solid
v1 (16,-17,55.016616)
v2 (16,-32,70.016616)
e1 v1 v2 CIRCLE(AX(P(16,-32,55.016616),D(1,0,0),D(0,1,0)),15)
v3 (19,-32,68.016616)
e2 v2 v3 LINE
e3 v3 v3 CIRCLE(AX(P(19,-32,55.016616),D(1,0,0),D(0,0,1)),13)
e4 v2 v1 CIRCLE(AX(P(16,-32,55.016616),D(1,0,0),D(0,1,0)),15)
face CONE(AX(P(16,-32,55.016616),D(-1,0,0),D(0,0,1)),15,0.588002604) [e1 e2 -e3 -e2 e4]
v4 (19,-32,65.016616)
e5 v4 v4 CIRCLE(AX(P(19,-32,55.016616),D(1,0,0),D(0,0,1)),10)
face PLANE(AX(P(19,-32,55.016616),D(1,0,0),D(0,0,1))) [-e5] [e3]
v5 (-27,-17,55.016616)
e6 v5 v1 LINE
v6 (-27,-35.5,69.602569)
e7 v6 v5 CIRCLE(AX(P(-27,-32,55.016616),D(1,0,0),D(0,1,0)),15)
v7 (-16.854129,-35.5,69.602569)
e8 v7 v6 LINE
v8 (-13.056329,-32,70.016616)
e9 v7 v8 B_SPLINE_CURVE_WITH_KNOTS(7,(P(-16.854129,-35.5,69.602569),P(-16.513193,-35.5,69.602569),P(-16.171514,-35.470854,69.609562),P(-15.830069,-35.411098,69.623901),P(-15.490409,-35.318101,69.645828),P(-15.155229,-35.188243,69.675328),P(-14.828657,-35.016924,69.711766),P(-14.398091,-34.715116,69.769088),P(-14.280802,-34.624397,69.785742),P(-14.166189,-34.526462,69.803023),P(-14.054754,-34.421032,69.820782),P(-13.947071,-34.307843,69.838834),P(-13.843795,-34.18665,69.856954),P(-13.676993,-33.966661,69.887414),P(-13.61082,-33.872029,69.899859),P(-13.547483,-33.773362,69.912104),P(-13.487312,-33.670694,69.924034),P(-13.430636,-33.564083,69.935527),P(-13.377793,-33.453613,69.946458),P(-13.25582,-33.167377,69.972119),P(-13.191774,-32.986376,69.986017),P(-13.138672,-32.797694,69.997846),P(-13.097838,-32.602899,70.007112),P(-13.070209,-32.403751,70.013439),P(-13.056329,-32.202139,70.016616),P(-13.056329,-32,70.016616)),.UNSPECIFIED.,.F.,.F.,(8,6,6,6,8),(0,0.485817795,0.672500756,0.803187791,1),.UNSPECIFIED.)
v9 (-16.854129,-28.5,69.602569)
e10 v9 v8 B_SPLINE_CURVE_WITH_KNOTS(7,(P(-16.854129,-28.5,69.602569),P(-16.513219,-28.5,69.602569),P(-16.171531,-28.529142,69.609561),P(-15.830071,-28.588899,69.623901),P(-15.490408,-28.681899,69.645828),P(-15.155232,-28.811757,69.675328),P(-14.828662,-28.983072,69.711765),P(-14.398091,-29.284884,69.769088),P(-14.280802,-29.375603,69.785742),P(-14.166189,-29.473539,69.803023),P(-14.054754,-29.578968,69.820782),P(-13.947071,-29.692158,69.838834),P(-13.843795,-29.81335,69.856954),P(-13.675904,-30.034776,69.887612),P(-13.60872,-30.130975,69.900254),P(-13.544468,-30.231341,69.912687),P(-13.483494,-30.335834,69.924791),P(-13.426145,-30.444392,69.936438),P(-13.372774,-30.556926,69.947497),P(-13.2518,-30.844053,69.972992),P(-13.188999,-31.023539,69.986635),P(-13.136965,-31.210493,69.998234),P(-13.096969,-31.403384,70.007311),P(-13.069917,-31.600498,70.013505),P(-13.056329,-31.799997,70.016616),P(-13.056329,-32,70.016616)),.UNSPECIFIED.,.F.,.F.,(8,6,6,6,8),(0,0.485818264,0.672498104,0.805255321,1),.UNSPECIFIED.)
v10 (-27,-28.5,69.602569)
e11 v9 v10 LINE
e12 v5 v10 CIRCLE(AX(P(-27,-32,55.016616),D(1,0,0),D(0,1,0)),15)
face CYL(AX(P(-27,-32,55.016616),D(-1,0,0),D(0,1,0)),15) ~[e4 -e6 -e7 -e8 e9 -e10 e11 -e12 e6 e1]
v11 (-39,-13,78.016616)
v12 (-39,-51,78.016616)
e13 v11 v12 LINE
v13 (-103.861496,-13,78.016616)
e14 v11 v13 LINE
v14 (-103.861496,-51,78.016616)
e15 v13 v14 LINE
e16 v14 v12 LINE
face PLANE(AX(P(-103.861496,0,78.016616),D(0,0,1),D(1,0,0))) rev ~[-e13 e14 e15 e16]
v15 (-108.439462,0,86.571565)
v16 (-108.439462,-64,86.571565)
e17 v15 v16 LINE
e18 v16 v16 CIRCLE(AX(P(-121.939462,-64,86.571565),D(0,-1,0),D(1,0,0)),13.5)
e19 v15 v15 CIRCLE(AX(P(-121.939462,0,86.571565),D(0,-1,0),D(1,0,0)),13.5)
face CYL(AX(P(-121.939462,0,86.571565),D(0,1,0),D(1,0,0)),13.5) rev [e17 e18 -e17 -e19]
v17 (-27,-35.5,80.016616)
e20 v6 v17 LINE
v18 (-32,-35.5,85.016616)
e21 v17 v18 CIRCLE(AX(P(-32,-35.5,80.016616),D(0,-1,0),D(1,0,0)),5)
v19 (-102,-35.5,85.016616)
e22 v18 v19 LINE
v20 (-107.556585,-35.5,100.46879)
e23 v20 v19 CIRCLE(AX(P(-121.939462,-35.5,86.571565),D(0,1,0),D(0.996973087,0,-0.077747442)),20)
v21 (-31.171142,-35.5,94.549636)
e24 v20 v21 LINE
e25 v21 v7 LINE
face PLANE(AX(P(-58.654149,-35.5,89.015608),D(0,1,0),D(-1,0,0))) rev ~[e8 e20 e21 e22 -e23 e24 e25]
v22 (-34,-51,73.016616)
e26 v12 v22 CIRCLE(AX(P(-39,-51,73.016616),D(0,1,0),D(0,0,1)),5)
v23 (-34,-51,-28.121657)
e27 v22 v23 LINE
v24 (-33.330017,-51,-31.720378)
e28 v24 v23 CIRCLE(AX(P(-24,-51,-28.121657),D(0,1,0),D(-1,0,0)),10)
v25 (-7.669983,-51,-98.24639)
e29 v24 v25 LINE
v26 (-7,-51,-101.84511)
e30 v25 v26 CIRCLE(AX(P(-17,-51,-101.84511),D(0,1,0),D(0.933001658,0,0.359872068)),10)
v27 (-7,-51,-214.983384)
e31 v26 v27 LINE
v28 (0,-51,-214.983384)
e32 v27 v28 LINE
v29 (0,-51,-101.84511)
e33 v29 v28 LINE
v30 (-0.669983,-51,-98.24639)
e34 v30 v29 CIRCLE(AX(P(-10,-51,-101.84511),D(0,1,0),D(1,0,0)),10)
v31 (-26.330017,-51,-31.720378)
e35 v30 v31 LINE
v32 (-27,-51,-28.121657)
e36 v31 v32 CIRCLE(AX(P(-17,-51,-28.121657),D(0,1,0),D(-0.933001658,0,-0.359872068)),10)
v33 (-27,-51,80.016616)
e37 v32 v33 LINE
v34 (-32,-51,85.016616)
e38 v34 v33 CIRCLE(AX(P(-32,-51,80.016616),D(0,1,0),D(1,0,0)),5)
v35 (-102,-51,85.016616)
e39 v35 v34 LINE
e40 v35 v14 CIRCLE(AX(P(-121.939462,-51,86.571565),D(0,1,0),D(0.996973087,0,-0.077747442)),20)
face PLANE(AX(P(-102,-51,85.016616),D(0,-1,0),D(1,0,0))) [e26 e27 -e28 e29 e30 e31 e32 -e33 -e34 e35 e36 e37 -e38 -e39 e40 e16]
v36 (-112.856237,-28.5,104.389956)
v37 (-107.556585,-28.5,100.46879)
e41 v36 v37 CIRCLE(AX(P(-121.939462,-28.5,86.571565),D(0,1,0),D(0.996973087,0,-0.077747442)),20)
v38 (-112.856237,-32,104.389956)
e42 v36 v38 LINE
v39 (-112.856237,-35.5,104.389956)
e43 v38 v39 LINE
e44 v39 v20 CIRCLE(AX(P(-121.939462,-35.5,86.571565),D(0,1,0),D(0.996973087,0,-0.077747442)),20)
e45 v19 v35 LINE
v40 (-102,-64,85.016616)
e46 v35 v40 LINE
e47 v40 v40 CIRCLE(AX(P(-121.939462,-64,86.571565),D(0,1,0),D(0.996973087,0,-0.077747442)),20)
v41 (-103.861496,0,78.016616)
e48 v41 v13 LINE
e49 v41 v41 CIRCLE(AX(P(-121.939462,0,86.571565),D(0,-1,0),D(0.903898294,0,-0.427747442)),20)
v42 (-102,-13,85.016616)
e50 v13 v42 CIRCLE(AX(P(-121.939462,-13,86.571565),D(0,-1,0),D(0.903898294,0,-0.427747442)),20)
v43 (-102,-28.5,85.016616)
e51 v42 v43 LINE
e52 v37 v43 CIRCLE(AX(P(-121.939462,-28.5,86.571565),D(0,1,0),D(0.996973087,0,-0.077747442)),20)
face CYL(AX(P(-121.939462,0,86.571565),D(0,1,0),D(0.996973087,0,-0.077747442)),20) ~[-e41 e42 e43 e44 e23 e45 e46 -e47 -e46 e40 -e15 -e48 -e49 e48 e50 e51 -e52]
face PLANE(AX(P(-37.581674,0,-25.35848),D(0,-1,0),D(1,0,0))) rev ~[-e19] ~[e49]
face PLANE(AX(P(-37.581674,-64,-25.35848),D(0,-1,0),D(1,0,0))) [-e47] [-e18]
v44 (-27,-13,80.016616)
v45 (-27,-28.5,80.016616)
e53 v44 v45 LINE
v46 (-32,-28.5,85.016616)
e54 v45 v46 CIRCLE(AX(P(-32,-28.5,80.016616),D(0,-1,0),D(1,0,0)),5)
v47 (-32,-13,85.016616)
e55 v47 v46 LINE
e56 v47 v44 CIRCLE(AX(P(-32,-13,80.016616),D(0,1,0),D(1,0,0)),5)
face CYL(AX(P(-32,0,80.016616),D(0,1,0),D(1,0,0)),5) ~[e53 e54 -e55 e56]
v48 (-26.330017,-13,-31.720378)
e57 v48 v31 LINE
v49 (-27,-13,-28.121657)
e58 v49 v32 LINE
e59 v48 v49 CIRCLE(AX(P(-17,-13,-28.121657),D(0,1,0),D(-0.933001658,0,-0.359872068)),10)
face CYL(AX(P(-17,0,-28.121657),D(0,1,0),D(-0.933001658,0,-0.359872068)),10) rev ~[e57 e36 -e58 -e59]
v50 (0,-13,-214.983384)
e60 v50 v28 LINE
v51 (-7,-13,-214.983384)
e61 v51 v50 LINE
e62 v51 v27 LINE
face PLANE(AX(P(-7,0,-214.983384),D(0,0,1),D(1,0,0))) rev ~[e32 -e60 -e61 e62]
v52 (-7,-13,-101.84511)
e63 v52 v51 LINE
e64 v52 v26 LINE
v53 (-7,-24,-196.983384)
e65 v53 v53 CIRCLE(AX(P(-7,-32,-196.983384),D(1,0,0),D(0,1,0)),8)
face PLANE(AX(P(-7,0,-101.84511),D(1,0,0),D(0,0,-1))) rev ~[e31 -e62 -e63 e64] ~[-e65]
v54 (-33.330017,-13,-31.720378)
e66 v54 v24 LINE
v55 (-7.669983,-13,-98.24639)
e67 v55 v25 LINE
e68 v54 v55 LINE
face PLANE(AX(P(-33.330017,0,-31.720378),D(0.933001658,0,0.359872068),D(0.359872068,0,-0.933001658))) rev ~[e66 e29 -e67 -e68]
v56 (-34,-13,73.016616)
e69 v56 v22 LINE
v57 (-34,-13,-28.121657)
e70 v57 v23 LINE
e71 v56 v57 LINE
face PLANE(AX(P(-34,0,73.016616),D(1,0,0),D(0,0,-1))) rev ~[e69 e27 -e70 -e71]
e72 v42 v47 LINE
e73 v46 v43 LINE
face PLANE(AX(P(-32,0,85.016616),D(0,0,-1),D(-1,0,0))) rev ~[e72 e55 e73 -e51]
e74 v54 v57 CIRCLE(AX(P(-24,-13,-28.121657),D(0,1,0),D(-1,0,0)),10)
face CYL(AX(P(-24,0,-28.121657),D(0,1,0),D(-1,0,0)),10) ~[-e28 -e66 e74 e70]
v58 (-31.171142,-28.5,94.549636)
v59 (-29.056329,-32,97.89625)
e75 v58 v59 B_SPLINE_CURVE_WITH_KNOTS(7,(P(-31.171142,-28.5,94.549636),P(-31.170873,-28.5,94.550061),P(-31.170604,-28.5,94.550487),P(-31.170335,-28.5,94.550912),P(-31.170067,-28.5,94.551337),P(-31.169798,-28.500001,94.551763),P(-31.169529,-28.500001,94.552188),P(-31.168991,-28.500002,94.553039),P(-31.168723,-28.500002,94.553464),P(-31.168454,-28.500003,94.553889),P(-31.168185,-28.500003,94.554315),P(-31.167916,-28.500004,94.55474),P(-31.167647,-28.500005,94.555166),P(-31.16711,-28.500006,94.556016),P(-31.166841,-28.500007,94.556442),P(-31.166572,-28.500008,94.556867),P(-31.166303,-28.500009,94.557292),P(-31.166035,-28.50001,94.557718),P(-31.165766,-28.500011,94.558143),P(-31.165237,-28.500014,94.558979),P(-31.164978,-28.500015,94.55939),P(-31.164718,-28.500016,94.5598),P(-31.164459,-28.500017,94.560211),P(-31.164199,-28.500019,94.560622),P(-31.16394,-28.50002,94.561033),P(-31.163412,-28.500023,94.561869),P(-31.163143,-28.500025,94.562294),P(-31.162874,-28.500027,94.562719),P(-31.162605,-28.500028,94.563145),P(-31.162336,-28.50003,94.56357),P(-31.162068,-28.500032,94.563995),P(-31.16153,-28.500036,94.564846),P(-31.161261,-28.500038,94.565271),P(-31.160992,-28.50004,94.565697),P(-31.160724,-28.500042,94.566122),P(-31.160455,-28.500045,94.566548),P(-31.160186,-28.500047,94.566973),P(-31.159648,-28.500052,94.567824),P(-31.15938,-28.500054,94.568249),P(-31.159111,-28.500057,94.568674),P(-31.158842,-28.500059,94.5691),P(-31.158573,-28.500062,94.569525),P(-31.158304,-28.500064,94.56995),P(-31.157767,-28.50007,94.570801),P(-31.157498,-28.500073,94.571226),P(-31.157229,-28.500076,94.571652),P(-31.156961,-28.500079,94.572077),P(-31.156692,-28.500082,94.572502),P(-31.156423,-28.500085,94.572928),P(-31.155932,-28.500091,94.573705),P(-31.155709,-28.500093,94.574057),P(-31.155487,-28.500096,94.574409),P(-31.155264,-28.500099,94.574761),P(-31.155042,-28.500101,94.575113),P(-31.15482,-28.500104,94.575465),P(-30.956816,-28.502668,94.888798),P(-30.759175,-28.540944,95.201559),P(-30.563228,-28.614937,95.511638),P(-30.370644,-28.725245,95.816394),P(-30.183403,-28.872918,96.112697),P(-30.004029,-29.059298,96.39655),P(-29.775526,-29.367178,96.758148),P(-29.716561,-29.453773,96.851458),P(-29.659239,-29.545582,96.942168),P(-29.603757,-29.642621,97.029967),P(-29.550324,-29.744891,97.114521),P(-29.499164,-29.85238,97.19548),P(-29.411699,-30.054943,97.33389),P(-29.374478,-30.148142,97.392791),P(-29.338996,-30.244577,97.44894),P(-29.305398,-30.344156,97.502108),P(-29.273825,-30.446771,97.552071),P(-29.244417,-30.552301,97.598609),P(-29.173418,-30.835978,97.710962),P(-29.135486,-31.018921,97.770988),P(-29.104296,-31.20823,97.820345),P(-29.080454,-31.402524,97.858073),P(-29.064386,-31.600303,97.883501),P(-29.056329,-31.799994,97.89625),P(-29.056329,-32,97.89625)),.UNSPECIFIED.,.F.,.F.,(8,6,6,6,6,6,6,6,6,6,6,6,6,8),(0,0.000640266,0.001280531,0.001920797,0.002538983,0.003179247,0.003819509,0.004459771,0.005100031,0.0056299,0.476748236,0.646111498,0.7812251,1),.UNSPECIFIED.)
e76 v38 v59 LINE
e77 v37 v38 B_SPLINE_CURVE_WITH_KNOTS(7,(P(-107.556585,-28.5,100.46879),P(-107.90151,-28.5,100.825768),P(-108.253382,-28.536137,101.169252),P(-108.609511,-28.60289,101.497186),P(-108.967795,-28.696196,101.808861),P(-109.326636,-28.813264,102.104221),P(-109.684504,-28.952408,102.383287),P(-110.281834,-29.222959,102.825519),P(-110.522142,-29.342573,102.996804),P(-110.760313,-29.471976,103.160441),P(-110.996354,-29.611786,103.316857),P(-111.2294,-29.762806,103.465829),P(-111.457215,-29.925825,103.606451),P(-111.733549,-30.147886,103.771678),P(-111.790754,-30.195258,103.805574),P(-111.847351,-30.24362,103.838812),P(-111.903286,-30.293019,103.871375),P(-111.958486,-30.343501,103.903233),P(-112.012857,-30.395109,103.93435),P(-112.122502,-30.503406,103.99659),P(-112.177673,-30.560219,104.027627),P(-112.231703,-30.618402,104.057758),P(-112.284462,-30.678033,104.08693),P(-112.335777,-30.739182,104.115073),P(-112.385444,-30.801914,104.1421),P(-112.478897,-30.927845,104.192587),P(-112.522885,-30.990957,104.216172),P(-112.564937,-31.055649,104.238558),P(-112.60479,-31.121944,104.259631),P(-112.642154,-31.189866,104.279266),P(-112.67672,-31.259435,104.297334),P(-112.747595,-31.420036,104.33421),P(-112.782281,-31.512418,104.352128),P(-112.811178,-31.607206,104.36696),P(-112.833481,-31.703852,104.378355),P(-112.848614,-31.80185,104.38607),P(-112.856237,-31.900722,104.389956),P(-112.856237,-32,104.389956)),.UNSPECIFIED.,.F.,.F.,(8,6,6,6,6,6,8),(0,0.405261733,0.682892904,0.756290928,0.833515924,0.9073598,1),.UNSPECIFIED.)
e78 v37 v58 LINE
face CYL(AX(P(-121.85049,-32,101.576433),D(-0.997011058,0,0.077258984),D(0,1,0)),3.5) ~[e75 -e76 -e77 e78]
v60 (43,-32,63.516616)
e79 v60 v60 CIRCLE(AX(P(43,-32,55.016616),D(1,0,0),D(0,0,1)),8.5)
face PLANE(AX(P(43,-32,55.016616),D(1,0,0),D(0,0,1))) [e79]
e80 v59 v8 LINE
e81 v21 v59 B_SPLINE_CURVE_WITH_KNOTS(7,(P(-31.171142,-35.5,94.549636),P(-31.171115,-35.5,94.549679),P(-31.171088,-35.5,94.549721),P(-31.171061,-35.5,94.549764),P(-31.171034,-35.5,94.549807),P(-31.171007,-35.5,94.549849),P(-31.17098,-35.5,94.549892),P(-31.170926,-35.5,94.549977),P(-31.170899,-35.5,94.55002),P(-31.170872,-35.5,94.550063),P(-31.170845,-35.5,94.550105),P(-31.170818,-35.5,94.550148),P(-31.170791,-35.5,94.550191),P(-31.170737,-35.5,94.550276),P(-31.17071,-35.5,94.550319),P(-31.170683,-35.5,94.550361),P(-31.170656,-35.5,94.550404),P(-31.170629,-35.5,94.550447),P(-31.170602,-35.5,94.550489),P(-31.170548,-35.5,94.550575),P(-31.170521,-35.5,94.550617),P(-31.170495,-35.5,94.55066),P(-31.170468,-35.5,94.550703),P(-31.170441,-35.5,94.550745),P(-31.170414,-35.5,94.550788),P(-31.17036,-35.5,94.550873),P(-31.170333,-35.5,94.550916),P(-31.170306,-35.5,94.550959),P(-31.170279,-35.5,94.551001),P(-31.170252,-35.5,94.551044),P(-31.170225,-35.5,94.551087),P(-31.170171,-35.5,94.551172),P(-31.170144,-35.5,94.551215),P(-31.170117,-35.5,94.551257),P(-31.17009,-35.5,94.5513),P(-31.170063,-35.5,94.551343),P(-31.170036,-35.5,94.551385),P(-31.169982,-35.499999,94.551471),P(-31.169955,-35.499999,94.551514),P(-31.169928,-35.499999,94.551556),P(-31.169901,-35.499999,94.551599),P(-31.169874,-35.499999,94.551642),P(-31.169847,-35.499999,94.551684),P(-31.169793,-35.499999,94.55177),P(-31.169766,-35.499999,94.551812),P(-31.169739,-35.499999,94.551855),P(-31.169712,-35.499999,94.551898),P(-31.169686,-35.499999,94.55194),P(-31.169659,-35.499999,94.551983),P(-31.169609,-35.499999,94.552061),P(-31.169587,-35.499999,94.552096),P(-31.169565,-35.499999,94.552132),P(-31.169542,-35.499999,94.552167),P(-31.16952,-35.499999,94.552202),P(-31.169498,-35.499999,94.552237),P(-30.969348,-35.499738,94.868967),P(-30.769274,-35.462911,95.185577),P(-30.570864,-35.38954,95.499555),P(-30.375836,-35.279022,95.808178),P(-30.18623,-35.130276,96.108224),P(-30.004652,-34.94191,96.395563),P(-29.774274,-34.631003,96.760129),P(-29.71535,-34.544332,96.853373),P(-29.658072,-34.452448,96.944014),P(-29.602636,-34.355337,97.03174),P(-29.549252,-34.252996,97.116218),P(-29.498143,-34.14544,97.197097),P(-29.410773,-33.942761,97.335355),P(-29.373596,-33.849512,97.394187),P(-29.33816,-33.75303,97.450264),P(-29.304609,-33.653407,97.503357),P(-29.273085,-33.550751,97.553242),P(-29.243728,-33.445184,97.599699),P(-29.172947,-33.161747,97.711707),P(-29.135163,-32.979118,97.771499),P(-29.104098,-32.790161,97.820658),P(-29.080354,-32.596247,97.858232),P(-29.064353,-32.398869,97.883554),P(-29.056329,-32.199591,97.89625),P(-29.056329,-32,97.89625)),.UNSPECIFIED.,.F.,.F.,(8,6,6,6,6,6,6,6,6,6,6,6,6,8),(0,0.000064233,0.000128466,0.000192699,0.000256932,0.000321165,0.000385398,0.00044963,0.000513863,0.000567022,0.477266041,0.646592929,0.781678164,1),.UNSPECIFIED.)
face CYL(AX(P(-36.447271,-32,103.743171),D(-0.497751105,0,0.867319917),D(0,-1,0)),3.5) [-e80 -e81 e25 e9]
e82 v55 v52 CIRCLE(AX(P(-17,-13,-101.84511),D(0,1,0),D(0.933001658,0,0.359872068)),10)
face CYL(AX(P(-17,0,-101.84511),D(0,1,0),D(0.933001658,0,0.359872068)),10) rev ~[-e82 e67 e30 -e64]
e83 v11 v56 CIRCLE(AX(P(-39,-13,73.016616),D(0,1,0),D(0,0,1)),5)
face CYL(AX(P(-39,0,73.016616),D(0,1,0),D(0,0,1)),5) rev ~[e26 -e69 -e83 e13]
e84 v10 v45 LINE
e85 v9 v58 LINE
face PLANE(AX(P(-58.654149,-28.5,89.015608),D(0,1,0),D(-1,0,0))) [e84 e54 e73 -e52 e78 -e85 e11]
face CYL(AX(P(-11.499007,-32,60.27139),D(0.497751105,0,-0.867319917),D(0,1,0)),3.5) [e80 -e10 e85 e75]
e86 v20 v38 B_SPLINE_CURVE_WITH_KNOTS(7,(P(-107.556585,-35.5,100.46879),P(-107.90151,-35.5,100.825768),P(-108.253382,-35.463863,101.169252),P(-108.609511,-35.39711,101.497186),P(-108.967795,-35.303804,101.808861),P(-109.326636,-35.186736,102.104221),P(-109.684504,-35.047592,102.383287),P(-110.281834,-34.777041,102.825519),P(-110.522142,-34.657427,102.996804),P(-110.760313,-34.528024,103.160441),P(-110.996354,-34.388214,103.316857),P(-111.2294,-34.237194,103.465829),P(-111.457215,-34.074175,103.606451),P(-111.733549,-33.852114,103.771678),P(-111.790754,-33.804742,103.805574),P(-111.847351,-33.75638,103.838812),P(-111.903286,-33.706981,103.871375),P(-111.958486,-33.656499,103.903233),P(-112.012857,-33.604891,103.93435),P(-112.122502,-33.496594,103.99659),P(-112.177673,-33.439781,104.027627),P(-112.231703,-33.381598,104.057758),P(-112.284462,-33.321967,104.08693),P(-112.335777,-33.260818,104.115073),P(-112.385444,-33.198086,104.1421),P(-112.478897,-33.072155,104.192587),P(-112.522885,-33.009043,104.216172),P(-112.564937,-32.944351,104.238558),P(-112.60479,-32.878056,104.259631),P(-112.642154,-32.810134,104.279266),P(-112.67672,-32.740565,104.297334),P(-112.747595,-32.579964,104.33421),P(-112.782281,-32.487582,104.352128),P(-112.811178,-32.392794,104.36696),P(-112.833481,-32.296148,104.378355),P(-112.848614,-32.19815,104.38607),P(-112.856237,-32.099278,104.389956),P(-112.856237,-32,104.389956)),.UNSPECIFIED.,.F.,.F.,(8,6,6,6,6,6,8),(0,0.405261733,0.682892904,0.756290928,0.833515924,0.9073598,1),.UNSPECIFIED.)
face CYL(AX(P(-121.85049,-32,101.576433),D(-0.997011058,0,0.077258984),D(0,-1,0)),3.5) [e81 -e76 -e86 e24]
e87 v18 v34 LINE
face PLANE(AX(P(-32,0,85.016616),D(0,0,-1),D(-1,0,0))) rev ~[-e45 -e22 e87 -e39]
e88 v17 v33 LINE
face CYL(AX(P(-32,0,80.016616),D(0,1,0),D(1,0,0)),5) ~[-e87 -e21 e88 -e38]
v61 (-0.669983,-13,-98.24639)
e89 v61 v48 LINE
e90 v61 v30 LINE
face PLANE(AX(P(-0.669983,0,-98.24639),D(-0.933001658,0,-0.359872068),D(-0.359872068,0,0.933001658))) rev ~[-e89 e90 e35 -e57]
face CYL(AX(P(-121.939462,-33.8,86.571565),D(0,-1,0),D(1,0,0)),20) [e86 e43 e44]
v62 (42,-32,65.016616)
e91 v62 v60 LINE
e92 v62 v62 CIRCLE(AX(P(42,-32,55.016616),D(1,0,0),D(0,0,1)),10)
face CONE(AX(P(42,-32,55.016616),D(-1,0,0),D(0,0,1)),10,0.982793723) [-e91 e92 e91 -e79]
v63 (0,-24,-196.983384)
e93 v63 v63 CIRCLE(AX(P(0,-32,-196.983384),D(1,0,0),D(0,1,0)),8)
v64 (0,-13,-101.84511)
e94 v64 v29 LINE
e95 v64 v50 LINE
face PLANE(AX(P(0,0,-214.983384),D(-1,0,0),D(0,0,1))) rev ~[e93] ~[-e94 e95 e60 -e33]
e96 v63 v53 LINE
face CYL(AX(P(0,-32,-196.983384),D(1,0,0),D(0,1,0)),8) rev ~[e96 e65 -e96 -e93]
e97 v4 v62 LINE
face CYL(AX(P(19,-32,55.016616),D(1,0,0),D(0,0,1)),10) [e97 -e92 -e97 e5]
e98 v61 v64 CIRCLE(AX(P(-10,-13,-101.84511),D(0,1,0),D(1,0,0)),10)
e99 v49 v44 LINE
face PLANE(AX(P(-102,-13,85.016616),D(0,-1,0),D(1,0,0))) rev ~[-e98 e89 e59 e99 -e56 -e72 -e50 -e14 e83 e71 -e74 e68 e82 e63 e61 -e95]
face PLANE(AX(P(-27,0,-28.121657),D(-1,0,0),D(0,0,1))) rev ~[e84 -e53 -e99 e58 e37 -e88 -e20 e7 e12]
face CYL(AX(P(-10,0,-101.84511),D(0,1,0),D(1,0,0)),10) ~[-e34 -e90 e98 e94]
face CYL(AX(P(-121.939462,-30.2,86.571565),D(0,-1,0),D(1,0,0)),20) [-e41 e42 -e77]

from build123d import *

# Parameters (mm, degrees)
F0_R           = 13.5
F1_DEPTH       = 64
F2_W           = 102
F2_H           = 13
F3_DEPTH       = 400
F5_DEPTH       = 13
F7_DEPTH       = 13
F8_R           = 15
F9_DEPTH       = 43
F14_DEPTH      = 3.5
F14_DEPTH_BACK = 3.5
F15_R          = 8
F16_DEPTH      = 25
F17_T4_DEPTH   = 101.551131953
F17_S5_R       = 20
F17_T6_DEPTH   = 53
F17_T10_DEPTH  = 101.551131953
F17_S11_R      = 20
F17_T12_DEPTH  = 53
F17_T16_DEPTH  = 50.1219672703
F17_S17_R      = 15
F17_T18_DEPTH  = 28
F17_T22_DEPTH  = 50.1219672703
F17_S23_R      = 15
F17_T24_DEPTH  = 28


# Not quite as in the source:
# - a fillet or chamfer that OpenCascade refuses, or shapes differently, is made with other operations: its cross-section is extruded or revolved along the edge and cut away or added


with BuildPart() as f1:
    # F0 (on Front) → F1 (new body)
    with BuildSketch(Plane.XZ):
        with BuildLine():
            Line((-7, -214.9833835959), (0, -214.9833835959))
            Line((0, -214.9833835959), (0, -101.8451102358))
            ThreePointArc((0, -101.8451102358), (-0.1689225963, -100.0148323657), (-0.6699834164, -98.2463895535))
            Line((-0.6699834164, -98.2463895535), (-26.3300165836, -31.7203776383))
            ThreePointArc((-26.3300165836, -31.7203776383), (-26.8310774037, -29.9519348262), (-27, -28.1216569561))
            Line((-27, -28.1216569561), (-27, 80.0166164041))
            ThreePointArc((-27, 80.0166164041), (-28.4644660941, 83.55215031), (-32, 85.0166164041))
            Line((-32, 85.0166164041), (-102, 85.0166164041))
            ThreePointArc((-102, 85.0166164041), (-141.2677104995, 91.7114873793), (-103.8614958525, 78.0166164041))
            Line((-103.8614958525, 78.0166164041), (-39, 78.0166164041))
            ThreePointArc((-39, 78.0166164041), (-35.4644660941, 76.55215031), (-34, 73.0166164041))
            Line((-34, 73.0166164041), (-34, -28.1216569561))
            ThreePointArc((-34, -28.1216569561), (-33.8310774037, -29.9519348262), (-33.3300165836, -31.7203776383))
            Line((-33.3300165836, -31.7203776383), (-7.6699834164, -98.2463895535))
            ThreePointArc((-7.6699834164, -98.2463895535), (-7.1689225963, -100.0148323657), (-7, -101.8451102358))
            Line((-7, -101.8451102358), (-7, -214.9833835959))
        make_face()
        with Locations((-121.9394617303, 86.5715652479)):
            Circle(F0_R, mode=Mode.SUBTRACT)
    extrude(amount=F1_DEPTH)

    # F2 (on face) → F3 (cut)
    with BuildSketch(Plane.XY.offset(85.0166164041)):
        with Locations((-51, -6.5)):
            Rectangle(F2_W, F2_H)
        with Locations((-51, -57.5)):
            Rectangle(F2_W, F2_H)
    extrude(amount=-F3_DEPTH, mode=Mode.SUBTRACT)

    # F4 (on face) → F5 (cut)
    with BuildSketch(Plane(origin=(0, 0, 0), x_dir=(-1, 0, 0), z_dir=(0, 1, 0))):
        with BuildLine():
            ThreePointArc((103.8614958525, 78.0166164041), (102.6112129611, 81.4316431166), (102, 85.0166164041))
            Line((102, 85.0166164041), (102, 78.0166164041))
            Line((102, 78.0166164041), (103.8614958525, 78.0166164041))
        make_face()
    extrude(amount=-F5_DEPTH, mode=Mode.SUBTRACT)

    # F6 (on face) → F7 (cut)
    with BuildSketch(Plane.XZ.offset(64)):
        with BuildLine():
            Line((-102, 78.0166164041), (-102, 85.0166164041))
            ThreePointArc((-102, 85.0166164041), (-102.6112129611, 81.4316431166), (-103.8614958525, 78.0166164041))
            Line((-103.8614958525, 78.0166164041), (-102, 78.0166164041))
        make_face()
    extrude(amount=-F7_DEPTH, mode=Mode.SUBTRACT)

    # F8 (on face) → F9 (join)
    with BuildSketch(Plane.YZ.offset(-27)):
        with Locations((-32, 55.0166164041)):
            Circle(F8_R)
    extrude(amount=F9_DEPTH)

    # F11 (on face) → F12 (revolve)
    with BuildSketch(Plane(origin=(0, -32, 0), x_dir=(-1, 0, 0), z_dir=(0, 1, 0))):
        Polygon((-16, 55.0166164041), (-16, 70.0166164041), (-19, 68.0166164041), (-19, 65.0166164041), (-42, 65.0166164041), (-43, 63.5166164041), (-43, 55.0166164041), align=None)
    revolve(axis=Axis((29.5, -32, 55.0166164041), (1, 0, 0)))

    # F13 (on face) → F14 (join, two sides)
    with BuildSketch(Plane(origin=(0, -32, 0), x_dir=(-1, 0, 0), z_dir=(0, 1, 0))) as f14_sk:
        with BuildLine():
            ThreePointArc((102.0563293248, 85.0166164041), (104.6045567862, 96.385687049), (113.0563293248, 104.4054608288))
            Line((113.0563293248, 104.4054608288), (29.0563293248, 97.8962504797))
            Line((29.0563293248, 97.8962504797), (13.0563293248, 70.0166164041))
            Line((13.0563293248, 70.0166164041), (10.7852649025, 66.0593385881))
            Line((10.7852649025, 66.0593385881), (27, 66.0593385881))
            Line((27, 66.0593385881), (27, 70.0166164041))
            Line((27, 70.0166164041), (27, 80.0166164041))
            ThreePointArc((27, 80.0166164041), (28.4644660941, 83.55215031), (32, 85.0166164041))
            Line((32, 85.0166164041), (102.0563293248, 85.0166164041))
        make_face()
    extrude(amount=F14_DEPTH)
    extrude(f14_sk.sketch, amount=-F14_DEPTH_BACK)

    # F15 (on face) → F16 (cut)
    with BuildSketch(Plane.YZ):
        with Locations((-32, -196.9833835959)):
            Circle(F15_R)
    extrude(amount=-F16_DEPTH, mode=Mode.SUBTRACT)

    # F17: fillet of radius 3.5 on 4 edges, made by hand


with BuildPart() as f17_tool2:
    # F17_s3 → F17_t4 (new body)
    with BuildSketch(Plane(origin=(-128.9474066936, 0, 9.992211835), x_dir=(0, 1, 0), z_dir=(0.9970110578, 0, -0.0772589845))):
        with BuildLine():
            ThreePointArc((-35.5, 91.8587817466), (-34.4748737342, 94.3336554808), (-32, 95.3587817466))
            Line((-32, 95.3587817466), (-35.5, 95.3587817466))
            Line((-35.5, 95.3587817466), (-35.5, 91.8587817466))
        make_face()
    extrude(amount=F17_T4_DEPTH)

    # F17_s5 → F17_t6 (cut, symmetric)
    with BuildSketch(Plane.XZ.offset(33.8)):
        with Locations((-121.9394617303, 86.5715652479)):
            Circle(F17_S5_R)
    extrude(amount=F17_T6_DEPTH, both=True, mode=Mode.SUBTRACT)


with BuildPart() as f1_1:
    add(f1.part)

    # F17_t1: cut F17_tool2
    add(f17_tool2.part, mode=Mode.SUBTRACT)


with BuildPart() as f17_tool8:
    # F17_s9 → F17_t10 (new body)
    with BuildSketch(Plane(origin=(-128.9474066936, 0, 9.992211835), x_dir=(0, 1, 0), z_dir=(0.9970110578, 0, -0.0772589845))):
        with BuildLine():
            ThreePointArc((-28.5, 91.8587817466), (-29.5251262658, 94.3336554808), (-32, 95.3587817466))
            Line((-32, 95.3587817466), (-28.5, 95.3587817466))
            Line((-28.5, 95.3587817466), (-28.5, 91.8587817466))
        make_face()
    extrude(amount=F17_T10_DEPTH)

    # F17_s11 → F17_t12 (cut, symmetric)
    with BuildSketch(Plane.XZ.offset(30.2)):
        with Locations((-121.9394617303, 86.5715652479)):
            Circle(F17_S11_R)
    extrude(amount=F17_T12_DEPTH, both=True, mode=Mode.SUBTRACT)


with BuildPart() as f1_2:
    add(f1_1.part)

    # F17_t7: cut F17_tool8
    add(f17_tool8.part, mode=Mode.SUBTRACT)


with BuildPart() as f17_tool14:
    # F17_s15 → F17_t16 (new body)
    with BuildSketch(Plane(origin=(-53.8169429454, 0, 93.7747922742), x_dir=(0, 1, 0), z_dir=(0.4977511049, 0, -0.8673199165))):
        with BuildLine():
            ThreePointArc((-35.5, 20.026833714), (-34.4748737342, 22.5017074481), (-32, 23.526833714))
            Line((-32, 23.526833714), (-35.5, 23.526833714))
            Line((-35.5, 23.526833714), (-35.5, 20.026833714))
        make_face()
    extrude(amount=F17_T16_DEPTH)

    # F17_s17 → F17_t18 (cut, symmetric)
    with BuildSketch(Plane.YZ.offset(-22.5)):
        with Locations((-32, 55.0166164041)):
            Circle(F17_S17_R)
    extrude(amount=F17_T18_DEPTH, both=True, mode=Mode.SUBTRACT)


with BuildPart() as f1_3:
    add(f1_2.part)

    # F17_t13: cut F17_tool14
    add(f17_tool14.part, mode=Mode.SUBTRACT)


with BuildPart() as f17_tool20:
    # F17_s21 → F17_t22 (new body)
    with BuildSketch(Plane(origin=(-28.8686783585, 0, 50.3030118051), x_dir=(0, 1, 0), z_dir=(-0.4977511049, 0, 0.8673199165))):
        with BuildLine():
            ThreePointArc((-28.5, -20.026833714), (-29.5251262658, -22.5017074481), (-32, -23.526833714))
            Line((-32, -23.526833714), (-28.5, -23.526833714))
            Line((-28.5, -23.526833714), (-28.5, -20.026833714))
        make_face()
    extrude(amount=F17_T22_DEPTH)

    # F17_s23 → F17_t24 (cut, symmetric)
    with BuildSketch(Plane.YZ.offset(-22.5)):
        with Locations((-32, 55.0166164041)):
            Circle(F17_S23_R)
    extrude(amount=F17_T24_DEPTH, both=True, mode=Mode.SUBTRACT)


with BuildPart() as f1_4:
    add(f1_3.part)

    # F17_t19: cut F17_tool20
    add(f17_tool20.part, mode=Mode.SUBTRACT)


solid = f1_4.part
